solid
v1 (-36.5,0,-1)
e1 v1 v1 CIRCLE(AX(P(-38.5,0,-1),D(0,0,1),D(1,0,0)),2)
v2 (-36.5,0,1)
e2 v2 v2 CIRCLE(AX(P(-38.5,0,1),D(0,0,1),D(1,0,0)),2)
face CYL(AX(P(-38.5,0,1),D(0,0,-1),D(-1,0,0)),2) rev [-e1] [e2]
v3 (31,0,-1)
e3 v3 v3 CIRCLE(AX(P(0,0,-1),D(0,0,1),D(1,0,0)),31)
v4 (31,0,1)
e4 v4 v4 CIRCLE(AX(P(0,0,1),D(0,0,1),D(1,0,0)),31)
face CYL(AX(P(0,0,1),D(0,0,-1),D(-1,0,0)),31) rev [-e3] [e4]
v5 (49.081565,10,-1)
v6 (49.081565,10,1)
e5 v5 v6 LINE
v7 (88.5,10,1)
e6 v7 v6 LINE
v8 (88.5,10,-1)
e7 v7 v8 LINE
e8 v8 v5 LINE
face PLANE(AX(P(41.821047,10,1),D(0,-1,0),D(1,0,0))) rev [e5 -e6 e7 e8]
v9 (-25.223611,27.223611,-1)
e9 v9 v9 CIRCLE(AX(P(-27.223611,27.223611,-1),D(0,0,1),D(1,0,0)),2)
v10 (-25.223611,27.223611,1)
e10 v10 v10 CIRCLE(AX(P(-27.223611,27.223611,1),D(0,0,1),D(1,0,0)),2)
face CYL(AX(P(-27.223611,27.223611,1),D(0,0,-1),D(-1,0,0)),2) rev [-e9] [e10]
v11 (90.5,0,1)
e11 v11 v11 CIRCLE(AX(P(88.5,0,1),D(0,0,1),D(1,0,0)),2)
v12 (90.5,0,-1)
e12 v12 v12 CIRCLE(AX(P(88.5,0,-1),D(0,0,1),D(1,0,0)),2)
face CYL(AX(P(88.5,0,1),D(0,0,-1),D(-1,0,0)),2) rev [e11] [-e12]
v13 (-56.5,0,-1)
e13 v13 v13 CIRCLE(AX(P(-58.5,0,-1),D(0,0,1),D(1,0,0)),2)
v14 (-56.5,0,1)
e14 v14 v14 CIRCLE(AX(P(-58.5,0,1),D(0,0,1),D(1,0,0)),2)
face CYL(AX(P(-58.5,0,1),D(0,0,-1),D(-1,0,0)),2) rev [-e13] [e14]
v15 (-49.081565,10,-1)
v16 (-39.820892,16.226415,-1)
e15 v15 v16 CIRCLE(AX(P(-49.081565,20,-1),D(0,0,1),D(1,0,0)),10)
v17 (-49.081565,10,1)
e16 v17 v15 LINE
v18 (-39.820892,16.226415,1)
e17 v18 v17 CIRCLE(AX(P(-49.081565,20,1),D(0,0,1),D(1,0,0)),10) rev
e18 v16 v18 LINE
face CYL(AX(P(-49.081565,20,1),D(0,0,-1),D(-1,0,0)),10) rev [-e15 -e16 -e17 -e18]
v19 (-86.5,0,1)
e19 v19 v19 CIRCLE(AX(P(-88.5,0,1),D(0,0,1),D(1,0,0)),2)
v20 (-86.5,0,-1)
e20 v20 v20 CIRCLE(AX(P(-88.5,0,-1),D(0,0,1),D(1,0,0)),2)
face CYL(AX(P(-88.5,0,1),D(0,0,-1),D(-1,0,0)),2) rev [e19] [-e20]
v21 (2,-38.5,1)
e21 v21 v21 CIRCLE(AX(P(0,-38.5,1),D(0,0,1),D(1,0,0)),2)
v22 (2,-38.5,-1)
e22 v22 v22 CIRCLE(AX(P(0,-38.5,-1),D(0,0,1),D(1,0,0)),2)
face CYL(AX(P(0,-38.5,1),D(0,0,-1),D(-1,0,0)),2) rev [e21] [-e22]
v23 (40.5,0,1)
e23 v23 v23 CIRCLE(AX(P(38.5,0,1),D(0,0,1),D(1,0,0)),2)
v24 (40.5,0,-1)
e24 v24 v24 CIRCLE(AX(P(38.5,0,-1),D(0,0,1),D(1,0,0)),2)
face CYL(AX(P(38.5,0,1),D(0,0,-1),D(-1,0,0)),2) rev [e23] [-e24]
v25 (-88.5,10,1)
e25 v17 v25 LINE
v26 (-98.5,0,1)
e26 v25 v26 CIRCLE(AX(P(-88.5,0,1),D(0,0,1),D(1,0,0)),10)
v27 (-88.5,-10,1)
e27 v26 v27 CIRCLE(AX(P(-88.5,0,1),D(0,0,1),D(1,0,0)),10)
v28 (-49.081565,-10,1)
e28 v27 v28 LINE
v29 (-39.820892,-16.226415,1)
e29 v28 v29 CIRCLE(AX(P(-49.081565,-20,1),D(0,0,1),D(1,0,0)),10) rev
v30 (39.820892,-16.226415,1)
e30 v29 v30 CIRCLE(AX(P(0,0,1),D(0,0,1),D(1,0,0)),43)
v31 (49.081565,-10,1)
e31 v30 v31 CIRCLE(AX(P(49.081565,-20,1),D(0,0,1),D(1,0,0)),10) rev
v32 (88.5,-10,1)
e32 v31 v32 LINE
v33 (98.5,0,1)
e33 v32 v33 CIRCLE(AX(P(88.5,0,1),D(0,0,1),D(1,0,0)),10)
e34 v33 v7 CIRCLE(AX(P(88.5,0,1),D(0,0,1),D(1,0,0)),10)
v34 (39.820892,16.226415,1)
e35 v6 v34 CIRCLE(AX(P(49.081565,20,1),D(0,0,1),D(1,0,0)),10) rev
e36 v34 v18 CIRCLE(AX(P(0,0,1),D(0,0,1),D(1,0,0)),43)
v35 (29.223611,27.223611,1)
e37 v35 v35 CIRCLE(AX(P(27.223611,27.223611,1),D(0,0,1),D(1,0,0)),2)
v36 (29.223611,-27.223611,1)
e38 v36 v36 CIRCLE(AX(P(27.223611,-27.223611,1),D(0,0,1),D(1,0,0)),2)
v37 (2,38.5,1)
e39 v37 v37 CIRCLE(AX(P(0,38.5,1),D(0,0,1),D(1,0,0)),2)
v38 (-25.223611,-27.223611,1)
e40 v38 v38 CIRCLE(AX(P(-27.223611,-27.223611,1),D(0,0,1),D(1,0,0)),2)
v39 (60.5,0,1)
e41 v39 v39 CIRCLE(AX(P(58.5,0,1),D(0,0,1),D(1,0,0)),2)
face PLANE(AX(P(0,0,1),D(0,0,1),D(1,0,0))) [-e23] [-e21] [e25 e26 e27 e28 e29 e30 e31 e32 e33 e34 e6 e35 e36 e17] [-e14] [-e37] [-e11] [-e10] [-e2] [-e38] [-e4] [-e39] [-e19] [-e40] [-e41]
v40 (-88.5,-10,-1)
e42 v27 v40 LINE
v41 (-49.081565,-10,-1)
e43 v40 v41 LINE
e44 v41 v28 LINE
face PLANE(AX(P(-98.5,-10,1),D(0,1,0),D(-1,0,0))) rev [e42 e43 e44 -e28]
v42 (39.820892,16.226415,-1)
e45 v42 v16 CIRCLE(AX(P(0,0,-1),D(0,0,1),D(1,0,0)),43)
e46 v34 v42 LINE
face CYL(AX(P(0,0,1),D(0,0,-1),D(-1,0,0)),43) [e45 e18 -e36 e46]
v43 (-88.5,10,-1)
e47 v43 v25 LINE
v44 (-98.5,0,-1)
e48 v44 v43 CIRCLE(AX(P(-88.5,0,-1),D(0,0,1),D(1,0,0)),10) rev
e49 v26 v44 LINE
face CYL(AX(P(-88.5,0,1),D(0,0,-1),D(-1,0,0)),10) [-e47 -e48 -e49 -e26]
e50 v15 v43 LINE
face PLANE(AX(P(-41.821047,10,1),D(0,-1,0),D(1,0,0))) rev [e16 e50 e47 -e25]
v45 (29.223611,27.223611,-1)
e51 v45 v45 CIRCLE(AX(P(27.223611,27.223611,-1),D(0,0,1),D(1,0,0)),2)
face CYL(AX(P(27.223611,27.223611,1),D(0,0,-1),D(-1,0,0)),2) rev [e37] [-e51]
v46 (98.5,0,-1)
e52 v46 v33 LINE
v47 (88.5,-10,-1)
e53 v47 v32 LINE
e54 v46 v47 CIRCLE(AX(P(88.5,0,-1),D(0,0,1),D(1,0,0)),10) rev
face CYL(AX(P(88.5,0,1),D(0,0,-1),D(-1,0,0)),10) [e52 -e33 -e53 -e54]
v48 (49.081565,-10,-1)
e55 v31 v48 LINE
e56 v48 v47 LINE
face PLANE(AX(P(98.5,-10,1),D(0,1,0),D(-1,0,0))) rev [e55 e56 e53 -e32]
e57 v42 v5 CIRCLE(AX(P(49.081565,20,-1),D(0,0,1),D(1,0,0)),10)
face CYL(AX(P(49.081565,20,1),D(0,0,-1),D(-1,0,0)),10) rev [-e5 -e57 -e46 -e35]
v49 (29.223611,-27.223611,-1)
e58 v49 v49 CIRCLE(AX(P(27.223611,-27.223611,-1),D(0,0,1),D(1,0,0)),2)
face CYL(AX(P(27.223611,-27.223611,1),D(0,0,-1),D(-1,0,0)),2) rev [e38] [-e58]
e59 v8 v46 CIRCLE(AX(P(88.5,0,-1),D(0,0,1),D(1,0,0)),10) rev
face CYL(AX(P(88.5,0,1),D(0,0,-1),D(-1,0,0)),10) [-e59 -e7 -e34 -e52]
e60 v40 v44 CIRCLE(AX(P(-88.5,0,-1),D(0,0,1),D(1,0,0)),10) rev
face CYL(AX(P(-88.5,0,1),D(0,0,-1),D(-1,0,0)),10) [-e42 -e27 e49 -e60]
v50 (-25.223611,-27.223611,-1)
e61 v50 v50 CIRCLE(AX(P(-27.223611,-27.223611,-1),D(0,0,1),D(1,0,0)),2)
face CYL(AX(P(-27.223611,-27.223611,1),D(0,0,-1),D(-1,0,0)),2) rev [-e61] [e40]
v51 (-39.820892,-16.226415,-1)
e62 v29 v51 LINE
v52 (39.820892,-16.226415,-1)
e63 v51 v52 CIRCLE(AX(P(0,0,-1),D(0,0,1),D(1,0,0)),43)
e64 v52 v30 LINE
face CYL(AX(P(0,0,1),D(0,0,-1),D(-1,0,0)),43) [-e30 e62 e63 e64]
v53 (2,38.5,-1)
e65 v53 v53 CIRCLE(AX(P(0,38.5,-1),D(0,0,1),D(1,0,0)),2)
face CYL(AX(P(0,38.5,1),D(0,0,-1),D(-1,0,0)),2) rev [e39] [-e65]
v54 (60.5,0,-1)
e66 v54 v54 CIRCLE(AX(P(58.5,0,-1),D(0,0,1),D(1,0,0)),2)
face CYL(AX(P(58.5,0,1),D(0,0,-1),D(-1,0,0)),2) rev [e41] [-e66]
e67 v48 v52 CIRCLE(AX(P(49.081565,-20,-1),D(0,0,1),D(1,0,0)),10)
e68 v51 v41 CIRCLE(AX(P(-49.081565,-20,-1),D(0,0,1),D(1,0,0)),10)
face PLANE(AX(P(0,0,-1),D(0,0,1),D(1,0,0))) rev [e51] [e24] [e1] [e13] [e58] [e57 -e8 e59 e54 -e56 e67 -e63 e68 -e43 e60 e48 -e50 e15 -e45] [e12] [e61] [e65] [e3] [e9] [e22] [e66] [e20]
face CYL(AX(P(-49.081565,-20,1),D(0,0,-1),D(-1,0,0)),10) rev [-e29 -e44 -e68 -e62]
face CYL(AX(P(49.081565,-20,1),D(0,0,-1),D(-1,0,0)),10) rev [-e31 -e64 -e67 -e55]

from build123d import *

# Parameters (mm, degrees)
SKETCH1_R           = 31
SKETCH1_R_2         = 2
BOSS_EXTRUDE1_DEPTH = 1
FILLET1_R           = 10


with BuildPart() as part:
    # Sketch1 → Boss-Extrude1 (new, symmetric)
    with BuildSketch(Plane.XY):
        with BuildLine():
            Line((-41.821047333, 10), (-98.5, 10))
            Line((-98.5, 10), (-98.5, -10))
            Line((-98.5, -10), (-41.821047333, -10))
            ThreePointArc((-41.821047333, -10), (0, -43), (41.821047333, -10))
            Line((41.821047333, -10), (98.5, -10))
            Line((98.5, -10), (98.5, 10))
            Line((98.5, 10), (41.821047333, 10))
            ThreePointArc((41.821047333, 10), (0, 43), (-41.821047333, 10))
        make_face()
        Circle(SKETCH1_R, mode=Mode.SUBTRACT)
        with Locations((0, 38.5)):
            Circle(SKETCH1_R_2, mode=Mode.SUBTRACT)
        with Locations((27.223611076, 27.223611076)):
            Circle(SKETCH1_R_2, mode=Mode.SUBTRACT)
        with Locations((38.5, 0)):
            Circle(SKETCH1_R_2, mode=Mode.SUBTRACT)
        with Locations((27.223611076, -27.223611076)):
            Circle(SKETCH1_R_2, mode=Mode.SUBTRACT)
        with Locations((0, -38.5)):
            Circle(SKETCH1_R_2, mode=Mode.SUBTRACT)
        with Locations((-27.223611076, -27.223611076)):
            Circle(SKETCH1_R_2, mode=Mode.SUBTRACT)
        with Locations((-38.5, 0)):
            Circle(SKETCH1_R_2, mode=Mode.SUBTRACT)
        with Locations((-27.223611076, 27.223611076)):
            Circle(SKETCH1_R_2, mode=Mode.SUBTRACT)
        with Locations((-58.5, 0)):
            Circle(SKETCH1_R_2, mode=Mode.SUBTRACT)
        with Locations((-88.5, 0)):
            Circle(SKETCH1_R_2, mode=Mode.SUBTRACT)
        with Locations((58.5, 0)):
            Circle(SKETCH1_R_2, mode=Mode.SUBTRACT)
        with Locations((88.5, 0)):
            Circle(SKETCH1_R_2, mode=Mode.SUBTRACT)
    extrude(amount=BOSS_EXTRUDE1_DEPTH, both=True)

    # Fillet1
    fillet1_edges = [part.edges().sort_by_distance(p)[0] for p in [
        (98.5, -10, 0),
        (98.5, 10, 0),
        (41.821047333, -10, 0),
        (41.821047333, 10, 0),
        (-41.821047333, -10, 0),
        (-98.5, -10, 0),
        (-98.5, 10, 0),
        (-41.821047333, 10, 0),
    ]]
    fillet(fillet1_edges, radius=FILLET1_R - 0.0001)  # a hair under: the kernel refuses the full size


solid = part.part
